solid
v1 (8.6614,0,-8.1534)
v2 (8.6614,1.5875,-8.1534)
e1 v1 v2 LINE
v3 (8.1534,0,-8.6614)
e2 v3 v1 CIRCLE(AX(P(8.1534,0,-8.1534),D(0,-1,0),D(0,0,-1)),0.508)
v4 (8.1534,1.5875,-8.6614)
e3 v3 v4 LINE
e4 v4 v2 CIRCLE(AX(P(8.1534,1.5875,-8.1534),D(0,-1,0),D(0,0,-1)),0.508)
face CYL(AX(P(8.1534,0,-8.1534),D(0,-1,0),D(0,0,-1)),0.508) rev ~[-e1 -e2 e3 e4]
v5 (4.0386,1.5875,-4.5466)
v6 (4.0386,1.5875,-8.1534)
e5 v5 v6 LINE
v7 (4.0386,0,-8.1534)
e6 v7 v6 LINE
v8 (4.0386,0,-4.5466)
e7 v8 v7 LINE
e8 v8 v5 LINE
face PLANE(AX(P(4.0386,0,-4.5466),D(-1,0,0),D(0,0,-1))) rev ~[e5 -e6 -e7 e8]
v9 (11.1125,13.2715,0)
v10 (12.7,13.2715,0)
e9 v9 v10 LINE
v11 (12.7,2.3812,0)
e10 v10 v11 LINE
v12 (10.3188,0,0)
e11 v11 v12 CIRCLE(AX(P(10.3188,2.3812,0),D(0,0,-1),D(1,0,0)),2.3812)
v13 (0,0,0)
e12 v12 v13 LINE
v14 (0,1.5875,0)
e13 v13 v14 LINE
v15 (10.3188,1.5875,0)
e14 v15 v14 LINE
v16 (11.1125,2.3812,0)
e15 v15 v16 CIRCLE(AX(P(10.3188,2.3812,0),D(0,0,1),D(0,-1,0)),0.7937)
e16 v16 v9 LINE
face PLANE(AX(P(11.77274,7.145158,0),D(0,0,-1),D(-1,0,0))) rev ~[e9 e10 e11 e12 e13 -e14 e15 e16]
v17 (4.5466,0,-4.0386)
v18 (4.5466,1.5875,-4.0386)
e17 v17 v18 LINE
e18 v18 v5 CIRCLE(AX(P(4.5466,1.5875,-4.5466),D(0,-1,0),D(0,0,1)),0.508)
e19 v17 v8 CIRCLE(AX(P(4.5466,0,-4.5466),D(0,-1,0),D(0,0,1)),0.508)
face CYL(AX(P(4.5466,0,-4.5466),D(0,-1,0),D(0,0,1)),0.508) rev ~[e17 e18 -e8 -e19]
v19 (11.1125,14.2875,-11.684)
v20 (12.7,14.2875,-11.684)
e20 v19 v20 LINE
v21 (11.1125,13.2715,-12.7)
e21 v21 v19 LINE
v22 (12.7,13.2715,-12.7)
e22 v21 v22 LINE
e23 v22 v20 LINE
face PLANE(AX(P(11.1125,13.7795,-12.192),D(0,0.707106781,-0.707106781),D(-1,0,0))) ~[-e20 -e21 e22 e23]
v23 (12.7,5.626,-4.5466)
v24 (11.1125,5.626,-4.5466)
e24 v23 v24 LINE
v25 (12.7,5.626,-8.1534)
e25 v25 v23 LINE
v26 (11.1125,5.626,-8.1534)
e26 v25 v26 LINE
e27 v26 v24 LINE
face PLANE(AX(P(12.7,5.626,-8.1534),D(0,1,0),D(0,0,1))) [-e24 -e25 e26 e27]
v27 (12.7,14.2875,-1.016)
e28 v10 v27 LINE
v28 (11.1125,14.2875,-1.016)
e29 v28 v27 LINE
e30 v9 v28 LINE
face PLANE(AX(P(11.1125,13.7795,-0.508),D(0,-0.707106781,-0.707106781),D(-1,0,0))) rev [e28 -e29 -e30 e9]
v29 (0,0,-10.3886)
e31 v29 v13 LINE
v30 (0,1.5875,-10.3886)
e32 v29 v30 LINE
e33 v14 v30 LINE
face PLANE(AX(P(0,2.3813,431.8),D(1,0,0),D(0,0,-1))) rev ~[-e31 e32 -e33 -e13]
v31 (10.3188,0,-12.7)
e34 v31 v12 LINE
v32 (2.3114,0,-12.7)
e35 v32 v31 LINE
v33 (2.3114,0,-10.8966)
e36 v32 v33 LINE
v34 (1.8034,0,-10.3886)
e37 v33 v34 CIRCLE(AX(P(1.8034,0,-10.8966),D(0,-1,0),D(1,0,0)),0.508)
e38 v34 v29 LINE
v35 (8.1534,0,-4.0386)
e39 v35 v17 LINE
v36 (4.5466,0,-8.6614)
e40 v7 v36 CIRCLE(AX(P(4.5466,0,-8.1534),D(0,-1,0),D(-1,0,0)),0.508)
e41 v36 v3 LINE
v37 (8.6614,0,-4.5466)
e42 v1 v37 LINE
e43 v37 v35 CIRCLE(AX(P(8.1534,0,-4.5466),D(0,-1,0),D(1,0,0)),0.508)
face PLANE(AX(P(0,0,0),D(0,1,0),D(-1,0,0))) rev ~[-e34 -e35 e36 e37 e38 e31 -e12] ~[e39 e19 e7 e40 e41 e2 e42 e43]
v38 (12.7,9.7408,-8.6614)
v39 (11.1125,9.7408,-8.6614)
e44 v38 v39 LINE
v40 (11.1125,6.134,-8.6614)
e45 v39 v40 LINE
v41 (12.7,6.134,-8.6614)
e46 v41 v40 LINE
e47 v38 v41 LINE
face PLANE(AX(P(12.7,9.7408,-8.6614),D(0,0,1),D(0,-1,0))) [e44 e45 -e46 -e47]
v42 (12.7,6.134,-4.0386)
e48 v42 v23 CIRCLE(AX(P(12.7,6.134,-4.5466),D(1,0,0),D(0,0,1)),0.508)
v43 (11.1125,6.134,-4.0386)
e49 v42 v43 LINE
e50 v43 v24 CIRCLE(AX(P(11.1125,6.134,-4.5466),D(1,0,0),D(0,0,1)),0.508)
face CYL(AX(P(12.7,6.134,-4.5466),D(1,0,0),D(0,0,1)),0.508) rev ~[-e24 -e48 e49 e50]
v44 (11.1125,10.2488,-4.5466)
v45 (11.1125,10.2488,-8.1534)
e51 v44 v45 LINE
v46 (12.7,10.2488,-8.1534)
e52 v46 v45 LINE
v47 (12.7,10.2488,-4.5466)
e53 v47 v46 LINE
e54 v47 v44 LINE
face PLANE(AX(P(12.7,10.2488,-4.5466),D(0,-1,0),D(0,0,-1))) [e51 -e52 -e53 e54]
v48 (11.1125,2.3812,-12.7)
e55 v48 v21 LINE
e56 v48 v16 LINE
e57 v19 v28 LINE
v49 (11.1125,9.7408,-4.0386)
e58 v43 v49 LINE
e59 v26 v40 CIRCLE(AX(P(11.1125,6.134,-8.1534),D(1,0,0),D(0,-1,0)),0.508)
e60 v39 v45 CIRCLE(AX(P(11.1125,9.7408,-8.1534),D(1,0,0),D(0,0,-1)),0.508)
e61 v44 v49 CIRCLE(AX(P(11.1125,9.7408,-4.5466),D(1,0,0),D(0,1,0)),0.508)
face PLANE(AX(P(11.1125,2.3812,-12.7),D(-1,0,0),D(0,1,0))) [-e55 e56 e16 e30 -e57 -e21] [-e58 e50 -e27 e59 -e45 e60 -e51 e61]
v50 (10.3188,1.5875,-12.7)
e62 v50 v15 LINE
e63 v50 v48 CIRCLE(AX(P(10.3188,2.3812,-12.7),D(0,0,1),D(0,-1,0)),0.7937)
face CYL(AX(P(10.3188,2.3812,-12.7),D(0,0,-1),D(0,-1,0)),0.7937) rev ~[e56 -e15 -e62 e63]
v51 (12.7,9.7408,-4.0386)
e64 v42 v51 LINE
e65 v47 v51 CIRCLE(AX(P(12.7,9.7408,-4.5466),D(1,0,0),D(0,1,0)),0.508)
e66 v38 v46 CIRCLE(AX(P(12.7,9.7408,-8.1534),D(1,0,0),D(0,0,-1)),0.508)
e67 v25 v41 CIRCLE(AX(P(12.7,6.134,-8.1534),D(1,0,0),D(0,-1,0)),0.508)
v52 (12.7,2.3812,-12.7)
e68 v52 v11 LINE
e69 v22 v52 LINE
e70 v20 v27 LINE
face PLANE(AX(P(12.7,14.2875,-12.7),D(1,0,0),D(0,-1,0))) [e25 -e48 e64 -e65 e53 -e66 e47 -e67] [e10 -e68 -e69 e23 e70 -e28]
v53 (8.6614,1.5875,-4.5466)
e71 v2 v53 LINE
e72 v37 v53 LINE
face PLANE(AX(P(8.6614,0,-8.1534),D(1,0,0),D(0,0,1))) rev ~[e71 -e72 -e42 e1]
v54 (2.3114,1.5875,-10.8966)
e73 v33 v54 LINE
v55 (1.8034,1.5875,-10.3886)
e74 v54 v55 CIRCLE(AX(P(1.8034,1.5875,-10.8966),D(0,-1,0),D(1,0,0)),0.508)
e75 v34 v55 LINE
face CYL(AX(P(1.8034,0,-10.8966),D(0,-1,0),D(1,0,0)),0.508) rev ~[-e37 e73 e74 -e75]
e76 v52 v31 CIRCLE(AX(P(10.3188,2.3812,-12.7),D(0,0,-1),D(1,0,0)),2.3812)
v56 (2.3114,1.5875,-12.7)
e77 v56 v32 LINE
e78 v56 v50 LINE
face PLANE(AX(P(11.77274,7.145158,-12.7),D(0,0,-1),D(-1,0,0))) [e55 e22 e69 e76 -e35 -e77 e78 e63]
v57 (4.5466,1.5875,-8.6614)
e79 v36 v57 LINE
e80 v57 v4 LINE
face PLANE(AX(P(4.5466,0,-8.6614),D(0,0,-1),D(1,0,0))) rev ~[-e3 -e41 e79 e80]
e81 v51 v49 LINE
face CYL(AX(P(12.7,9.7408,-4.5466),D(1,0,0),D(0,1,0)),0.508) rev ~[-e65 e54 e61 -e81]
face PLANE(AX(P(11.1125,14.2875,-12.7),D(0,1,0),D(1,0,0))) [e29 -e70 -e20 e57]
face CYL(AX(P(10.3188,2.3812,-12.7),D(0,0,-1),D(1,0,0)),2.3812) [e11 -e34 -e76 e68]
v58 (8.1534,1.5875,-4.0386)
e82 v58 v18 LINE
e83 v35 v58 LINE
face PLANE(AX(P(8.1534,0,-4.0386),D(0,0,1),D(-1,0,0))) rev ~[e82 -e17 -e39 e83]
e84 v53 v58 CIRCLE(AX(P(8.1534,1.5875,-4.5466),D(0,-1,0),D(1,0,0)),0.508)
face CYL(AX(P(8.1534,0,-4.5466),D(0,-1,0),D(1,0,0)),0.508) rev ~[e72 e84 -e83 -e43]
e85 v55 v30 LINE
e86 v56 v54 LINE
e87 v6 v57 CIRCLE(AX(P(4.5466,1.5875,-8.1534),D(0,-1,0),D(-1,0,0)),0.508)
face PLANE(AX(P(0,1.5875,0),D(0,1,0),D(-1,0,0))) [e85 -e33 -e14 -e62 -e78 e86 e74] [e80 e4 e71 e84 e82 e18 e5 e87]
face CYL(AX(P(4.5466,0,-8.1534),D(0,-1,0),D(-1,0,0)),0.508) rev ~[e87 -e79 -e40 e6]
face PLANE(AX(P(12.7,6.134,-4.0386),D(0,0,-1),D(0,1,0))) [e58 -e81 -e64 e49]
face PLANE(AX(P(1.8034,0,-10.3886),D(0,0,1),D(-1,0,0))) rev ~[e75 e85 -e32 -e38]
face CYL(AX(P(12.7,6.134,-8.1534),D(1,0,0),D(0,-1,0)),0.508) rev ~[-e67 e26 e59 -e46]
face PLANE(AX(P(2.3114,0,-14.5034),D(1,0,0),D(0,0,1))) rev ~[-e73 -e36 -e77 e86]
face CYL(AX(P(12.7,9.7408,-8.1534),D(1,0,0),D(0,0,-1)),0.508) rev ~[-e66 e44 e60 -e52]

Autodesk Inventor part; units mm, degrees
ref_plane "YZ Plane" through (0, 0, 0) normal (1, 0, 0) x (0, 1, 0)
ref_plane "XZ Plane" through (0, 0, 0) normal (0, 1, 0) x (-1, 0, 0)
sketch "Sketch1" plane through (0, 0, 0) normal (0, 1, 0) x (-1, 0, 0)
  line L0 (-12.7, 0) -> (12.7, 0)
  line L1 (12.7, 0) -> (12.7, -12.7)
  line L2 (12.7, -12.7) -> (-12.7, -12.7)
  line L3 (-12.7, -12.7) -> (-12.7, 0)
  line L4 (12.7, 0) -> (-12.7, -12.7) construction
  point P0 (0, 0)
  point P1 (0, 0)
  dimension "d0" = 25.4
  dimension "d1" = 12.7
extrude "Plate1" add sketch "Sketch1" along normal blind 1.5875
sketch "Sketch2" plane through (11.1125, 0, -12.7) normal (1, 0, 0) x (0, 1, 0)
  line L0 (0, 12.7) -> (0, 0)
  line L1 (0, 0) -> (14.2875, 0)
  line L2 (14.2875, 0) -> (14.2875, 12.7)
  line L3 (14.2875, 12.7) -> (0, 12.7)
edge flange "Flanges" height 12.7 angle 90 thickness 1.5875 bend radius 0.7937 thickness toward (1, 0, 0) relief tear relief width 1.5875 relief depth 0.7937 corner gap 1.5875 corner form 0 edges at (12.7, 1.5875, -6.35) (-12.7, 1.5875, -6.35) wall of the first edge with corners at (11.1125, 0, 0) (11.1125, 0, -12.7) (11.1125, 14.2875, -12.7) (11.1125, 14.2875, 0)
bend "Bend1"
corner "Corner1"
sketch "Sketch3" plane through (12.7, 2.3812, -12.7) normal (1, 0, 0) x (0, 0, -1)
  line L0 (-8.1534, 7.8676) -> (-4.5466, 7.8676)
  line L1 (-4.0386, 7.3596) -> (-4.0386, 3.7528)
  line L2 (-4.5466, 3.2448) -> (-8.1534, 3.2448)
  line L3 (-8.6614, 3.7528) -> (-8.6614, 7.3596)
  arc A0 (-8.1534, 7.8676) -> (-8.6614, 7.3596) centre (-8.1534, 7.3596) ccw
  arc A1 (-4.0386, 7.3596) -> (-4.5466, 7.8676) centre (-4.5466, 7.3596) ccw
  arc A2 (-4.5466, 3.2448) -> (-4.0386, 3.7528) centre (-4.5466, 3.7528) ccw
  arc A3 (-8.6614, 3.7528) -> (-8.1534, 3.2448) centre (-8.1534, 3.7528) ccw
  line L4 (-12.7, 0) -> (-12.7, 11.9062) construction
  line L5 (-12.7, 11.9062) -> (0, 11.9062) construction
  line L6 (-8.1534, 7.3596) -> (-4.5466, 3.7528) construction
  point P0 (-12.7, -2.3813)
  point P1 (-4.0386, 3.2448)
  point P2 (-8.6614, 3.2448)
  point P3 (-6.35, 5.5562)
  dimension "d16" = 4.6228
  dimension "d17" = 0.508
  dimension "d20" = 6.35
  dimension "d21" = 6.35
extrude "Flange Stamp" cut sketch "Sketch3" against normal blind 1.5875
sketch "Sketch7" plane through (12.7, 2.3813, 0) normal (1, 0, 0) x (0, 0, -1)
  arc A0 (4.5466, 7.8676) -> (4.0386, 7.3596) centre (4.5466, 7.3596) ccw construction
  arc A1 (8.1534, 3.2448) -> (8.6614, 3.7528) centre (8.1534, 3.7528) ccw construction
  circle A2 centre (6.35, 5.5563) radius 2.1844
  line L0 (4.5466, 7.3596) -> (8.1534, 3.7528) construction
  point P0 (0, -2.3813)
  dimension "d46" = 4.3688
surface extrude "Flange Circle" sketch "Sketch7" against normal up to surface (1.5875 mm away) shown yes curves A2
ref_plane "Flange Pattern Plane" through (12.7, 7.9375, -4.5466) normal (0, 1, 0) x (1, 0, 0)
sketch "Flange Pattern Sketch" plane through (12.7, 7.9375, -4.5466) normal (0, 1, 0) x (1, 0, 0)
  line L0 (0, 3.6068) -> (0, 0) construction
  line L1 (-30.5786, -4.5466) -> (5.6718, -4.5466) construction
  line L2 (0, 0) -> (-1.5875, 0) construction
  point P0 (-12.7, -4.5466)
  point P1 (0, 1.8034)
  point P2 (0, 14.5034)
  dimension "d43" = 25.4
  dimension "d40" = 12.7
feature "Flange Pattern" [suppressed]
sketch "Sketch8" plane through (0, 0, 0) normal (0, -1, 0) x (1, 0, 0)
  line L0 (10.3187, 0) -> (-10.3187, 0) construction
  line L1 (8.1534, -4.0386) -> (4.5466, -4.0386)
  line L2 (4.0386, -4.5466) -> (4.0386, -8.1534)
  line L3 (4.5466, -8.6614) -> (8.1534, -8.6614)
  line L4 (8.6614, -8.1534) -> (8.6614, -4.5466)
  arc A0 (8.6614, -4.5466) -> (8.1534, -4.0386) centre (8.1534, -4.5466) ccw
  arc A1 (8.1534, -8.6614) -> (8.6614, -8.1534) centre (8.1534, -8.1534) ccw
  arc A2 (4.0386, -8.1534) -> (4.5466, -8.6614) centre (4.5466, -8.1534) ccw
  arc A3 (4.5466, -4.0386) -> (4.0386, -4.5466) centre (4.5466, -4.5466) ccw
  line L5 (8.1534, -4.5466) -> (4.5466, -8.1534) construction
  line L6 (12.7, 0) -> (12.7, -12.7) construction
  point P0 (0, 0)
  point P1 (4.0386, -8.6614)
  point P2 (8.6614, -8.6614)
  point P3 (6.35, -6.35)
  dimension "d49" = 4.6228
  dimension "d50" = 0.508
  dimension "d51" = 6.35
  dimension "d52" = 6.35
extrude "Body Stamp" cut sketch "Sketch8" against normal blind 1.5875
sketch "Sketch9" plane through (0, 0, 0) normal (0, -1, 0) x (1, 0, 0)
  arc A0 (8.6614, -4.5466) -> (8.1534, -4.0386) centre (8.1534, -4.5466) ccw construction
  arc A1 (4.0386, -8.1534) -> (4.5466, -8.6614) centre (4.5466, -8.1534) ccw construction
  line L0 (8.1534, -4.5466) -> (4.5466, -8.1534) construction
  circle A2 centre (6.35, -6.35) radius 2.1844
  point P0 (0, 0)
  dimension "d55" = 4.3688
surface extrude "Body Circle" sketch "Sketch9" against normal up to surface (1.5875 mm away) shown yes curves A2
sketch "Body Pattern Sketch" plane through (0, 0, 0) normal (0, -1, 0) x (1, 0, 0)
  line L0 (10.3187, 0) -> (-10.3187, 0) construction
  line L1 (12.7, 0) -> (12.7, -12.7) construction
  point P0 (0, 0)
  point P1 (6.35, -6.35)
  point P2 (6.35, -19.05)
  dimension "d62" = 12.7
  dimension "d65" = 12.7
  dimension "d58" = 6.35
  dimension "d99" = 6.35
feature "Body Pattern" [suppressed]
sketch "Sketch15" plane through (0, 0, 0) normal (0, -1, 0) x (1, 0, 0)
  line L0 (10.3187, 0) -> (-10.3187, 0) construction
  line L1 (1.8034, -10.3886) -> (-1.8034, -10.3886)
  line L2 (-2.3114, -10.8966) -> (-2.3114, -14.5034)
  line L3 (-1.8034, -15.0114) -> (1.8034, -15.0114)
  line L4 (2.3114, -14.5034) -> (2.3114, -10.8966)
  arc A0 (2.3114, -10.8966) -> (1.8034, -10.3886) centre (1.8034, -10.8966) ccw
  arc A1 (1.8034, -15.0114) -> (2.3114, -14.5034) centre (1.8034, -14.5034) ccw
  arc A2 (-1.8034, -10.3886) -> (-2.3114, -10.8966) centre (-1.8034, -10.8966) ccw
  arc A3 (-2.3114, -14.5034) -> (-1.8034, -15.0114) centre (-1.8034, -14.5034) ccw
  line L5 (1.8034, -10.8966) -> (-1.8034, -14.5034) construction
  line L6 (12.7, 0) -> (12.7, -12.7) construction
  point P0 (0, 0)
  point P1 (-2.3114, -15.0114)
  point P2 (2.3114, -15.0114)
  point P3 (0, -12.7)
  dimension "d106" = 4.6228
  dimension "d107" = 0.508
  dimension "d108" = 12.7
  dimension "d109" = 12.7
extrude "Center Stamp" cut sketch "Sketch15" against normal blind 1.5875
extrude_surface "Center Circle" [suppressed]
pattern_linear "Center Pattern" [suppressed]
sketch "Arc Length" plane through (11.1125, 2.3813, 0) normal (0, 0, 1) x (1, 0, 0)
  line L0 (0, 0) -> (1.5875, 0) construction
  arc A0 (-0.7937, -0.7938) -> (0, 0) centre (-0.7937, 0) ccw construction
  line L1 (-0.7937, -2.3813) -> (-0.7937, -0.7938) construction
  arc A1 (-0.7937, -2.3813) -> (1.5875, 0) centre (-0.7937, 0) ccw construction
  point P0 (-11.1125, -2.3813)
  dimension "d85" = 3.7405
  dimension "d92" = 1.2468
feature "Notch" [suppressed]
mirror "Notch Mirror" [suppressed]
pattern_linear "Notch Pattern" [suppressed]
chamfer "End Chamfer" distance 1.016 angle 45 4 edges at (-11.9062, 14.2875, -12.7) (11.9063, 14.2875, -12.7) (-11.9062, 14.2875, 0) (11.9062, 14.2875, 0)
sketch "Sketch14" plane through (-12.7, 2.3813, 431.8) normal (1, 0, 0) x (0, 0, -1)
  line L0 (431.8, 11.9063) -> (444.5, 11.9063) construction
  line L1 (431.8, 0) -> (431.8, 11.9063) construction
  line L2 (431.8, -2.3813) -> (444.5, -2.3813) construction
  line L3 (431.8, 11.9063) -> (444.5, 11.9063)
  line L4 (444.5, 11.9063) -> (444.5, -2.3813)
  line L5 (444.5, -2.3813) -> (431.8, -2.3813)
  line L6 (431.8, -2.3813) -> (431.8, 11.9063)
  point P0 (62.4078, 11.9062)
  point P1 (432.816, 11.9063)
  point P2 (431.8, 10.8903)
  point P3 (431.8, -2.3812)
  point P4 (382.0521, -1.9844)
  point P5 (443.484, 11.9063)
  point P6 (254.9398, 11.9062)
  point P7 (316.4078, 11.9062)
extrude "Half Cut" cut sketch "Sketch14" along normal blind 12.7
sketch "Sketch13" plane through (12.7, 14.2875, 0) normal (1, 0, 0) x (0, 0, -1)
  line L0 (0, 0) -> (12.7, 0) construction
  line L1 (62.4078, 0) -> (63.4238, -1.016)
  line L2 (63.4238, -1.016) -> (64.4398, 0)
  line L3 (62.4078, 0) -> (64.4398, 0)
  line L4 (12.7, -11.9062) -> (0, -11.9062) construction
  line L5 (63.4238, -10.8903) -> (61.161, -13.1531)
  line L6 (61.161, -13.1531) -> (63.4238, -15.4159)
  line L7 (63.4238, -15.4159) -> (65.6866, -13.1531)
  line L8 (65.6866, -13.1531) -> (63.4238, -10.8903)
  line L9 (63.4238, -10.8903) -> (63.4238, -15.4159) construction
  line L10 (63.4238, -1.016) -> (63.4238, -10.8903) construction
  line L11 (0, -11.9062) -> (12.7, -11.9062) construction
  point P0 (0, -14.2875)
  dimension "d86" = 4.5256
  dimension "d88" = 1.016
  dimension "d91" = 1.016
  dimension "d102" = 63.4238
sketch "Sketch16" plane through (0, 0, 0) normal (0, -1, 0) x (1, 0, 0)
  circle A0 centre (0, -12.7) radius 2.1844
  line L0 (10.3187, 0) -> (-10.3187, 0) construction
  line L1 (12.7, 0) -> (12.7, -12.7) construction
  point P0 (0, 0)
  dimension "d112" = 4.3688
  dimension "d118" = 12.7
  dimension "d119" = 12.7
equation "\"d18\" = Thickness"
equation "\"d53\" = Thickness"
equation "\"d89\" = Thickness"
equation "\"d1\" = 12.7 * Length"
equation "\"d2\" = Thickness"
equation "\"d3\" = BendReliefWidth"
equation "\"d4\" = BendReliefDepth"
equation "\"d5\" = MinimumRemnant"
equation "\"d6\" = TransitionRadius"
equation "\"d10\" = CornerReliefSize"
equation "\"d11\" = GapSize"
equation "\"d12\" = JacobiRadiusSize"
equation "\"BendRadius\" = Thickness"
equation "\"BendReliefWidth\" = Thickness"
equation "\"BendReliefDepth\" = 0.5 * Thickness"
equation "\"CornerReliefSize\" = 4 * Thickness"
equation "\"MinimumRemnant\" = 2 * Thickness"
equation "\"TransitionRadius\" = BendRadius"
equation "\"JacobiRadiusSize\" = BendRadius"
equation "\"GapSize\" = Thickness"
equation "\"Thickness\" = 1.5875"
equation "\"Length\" = 1"
properties part number "Alu C 1x2x1x35"
